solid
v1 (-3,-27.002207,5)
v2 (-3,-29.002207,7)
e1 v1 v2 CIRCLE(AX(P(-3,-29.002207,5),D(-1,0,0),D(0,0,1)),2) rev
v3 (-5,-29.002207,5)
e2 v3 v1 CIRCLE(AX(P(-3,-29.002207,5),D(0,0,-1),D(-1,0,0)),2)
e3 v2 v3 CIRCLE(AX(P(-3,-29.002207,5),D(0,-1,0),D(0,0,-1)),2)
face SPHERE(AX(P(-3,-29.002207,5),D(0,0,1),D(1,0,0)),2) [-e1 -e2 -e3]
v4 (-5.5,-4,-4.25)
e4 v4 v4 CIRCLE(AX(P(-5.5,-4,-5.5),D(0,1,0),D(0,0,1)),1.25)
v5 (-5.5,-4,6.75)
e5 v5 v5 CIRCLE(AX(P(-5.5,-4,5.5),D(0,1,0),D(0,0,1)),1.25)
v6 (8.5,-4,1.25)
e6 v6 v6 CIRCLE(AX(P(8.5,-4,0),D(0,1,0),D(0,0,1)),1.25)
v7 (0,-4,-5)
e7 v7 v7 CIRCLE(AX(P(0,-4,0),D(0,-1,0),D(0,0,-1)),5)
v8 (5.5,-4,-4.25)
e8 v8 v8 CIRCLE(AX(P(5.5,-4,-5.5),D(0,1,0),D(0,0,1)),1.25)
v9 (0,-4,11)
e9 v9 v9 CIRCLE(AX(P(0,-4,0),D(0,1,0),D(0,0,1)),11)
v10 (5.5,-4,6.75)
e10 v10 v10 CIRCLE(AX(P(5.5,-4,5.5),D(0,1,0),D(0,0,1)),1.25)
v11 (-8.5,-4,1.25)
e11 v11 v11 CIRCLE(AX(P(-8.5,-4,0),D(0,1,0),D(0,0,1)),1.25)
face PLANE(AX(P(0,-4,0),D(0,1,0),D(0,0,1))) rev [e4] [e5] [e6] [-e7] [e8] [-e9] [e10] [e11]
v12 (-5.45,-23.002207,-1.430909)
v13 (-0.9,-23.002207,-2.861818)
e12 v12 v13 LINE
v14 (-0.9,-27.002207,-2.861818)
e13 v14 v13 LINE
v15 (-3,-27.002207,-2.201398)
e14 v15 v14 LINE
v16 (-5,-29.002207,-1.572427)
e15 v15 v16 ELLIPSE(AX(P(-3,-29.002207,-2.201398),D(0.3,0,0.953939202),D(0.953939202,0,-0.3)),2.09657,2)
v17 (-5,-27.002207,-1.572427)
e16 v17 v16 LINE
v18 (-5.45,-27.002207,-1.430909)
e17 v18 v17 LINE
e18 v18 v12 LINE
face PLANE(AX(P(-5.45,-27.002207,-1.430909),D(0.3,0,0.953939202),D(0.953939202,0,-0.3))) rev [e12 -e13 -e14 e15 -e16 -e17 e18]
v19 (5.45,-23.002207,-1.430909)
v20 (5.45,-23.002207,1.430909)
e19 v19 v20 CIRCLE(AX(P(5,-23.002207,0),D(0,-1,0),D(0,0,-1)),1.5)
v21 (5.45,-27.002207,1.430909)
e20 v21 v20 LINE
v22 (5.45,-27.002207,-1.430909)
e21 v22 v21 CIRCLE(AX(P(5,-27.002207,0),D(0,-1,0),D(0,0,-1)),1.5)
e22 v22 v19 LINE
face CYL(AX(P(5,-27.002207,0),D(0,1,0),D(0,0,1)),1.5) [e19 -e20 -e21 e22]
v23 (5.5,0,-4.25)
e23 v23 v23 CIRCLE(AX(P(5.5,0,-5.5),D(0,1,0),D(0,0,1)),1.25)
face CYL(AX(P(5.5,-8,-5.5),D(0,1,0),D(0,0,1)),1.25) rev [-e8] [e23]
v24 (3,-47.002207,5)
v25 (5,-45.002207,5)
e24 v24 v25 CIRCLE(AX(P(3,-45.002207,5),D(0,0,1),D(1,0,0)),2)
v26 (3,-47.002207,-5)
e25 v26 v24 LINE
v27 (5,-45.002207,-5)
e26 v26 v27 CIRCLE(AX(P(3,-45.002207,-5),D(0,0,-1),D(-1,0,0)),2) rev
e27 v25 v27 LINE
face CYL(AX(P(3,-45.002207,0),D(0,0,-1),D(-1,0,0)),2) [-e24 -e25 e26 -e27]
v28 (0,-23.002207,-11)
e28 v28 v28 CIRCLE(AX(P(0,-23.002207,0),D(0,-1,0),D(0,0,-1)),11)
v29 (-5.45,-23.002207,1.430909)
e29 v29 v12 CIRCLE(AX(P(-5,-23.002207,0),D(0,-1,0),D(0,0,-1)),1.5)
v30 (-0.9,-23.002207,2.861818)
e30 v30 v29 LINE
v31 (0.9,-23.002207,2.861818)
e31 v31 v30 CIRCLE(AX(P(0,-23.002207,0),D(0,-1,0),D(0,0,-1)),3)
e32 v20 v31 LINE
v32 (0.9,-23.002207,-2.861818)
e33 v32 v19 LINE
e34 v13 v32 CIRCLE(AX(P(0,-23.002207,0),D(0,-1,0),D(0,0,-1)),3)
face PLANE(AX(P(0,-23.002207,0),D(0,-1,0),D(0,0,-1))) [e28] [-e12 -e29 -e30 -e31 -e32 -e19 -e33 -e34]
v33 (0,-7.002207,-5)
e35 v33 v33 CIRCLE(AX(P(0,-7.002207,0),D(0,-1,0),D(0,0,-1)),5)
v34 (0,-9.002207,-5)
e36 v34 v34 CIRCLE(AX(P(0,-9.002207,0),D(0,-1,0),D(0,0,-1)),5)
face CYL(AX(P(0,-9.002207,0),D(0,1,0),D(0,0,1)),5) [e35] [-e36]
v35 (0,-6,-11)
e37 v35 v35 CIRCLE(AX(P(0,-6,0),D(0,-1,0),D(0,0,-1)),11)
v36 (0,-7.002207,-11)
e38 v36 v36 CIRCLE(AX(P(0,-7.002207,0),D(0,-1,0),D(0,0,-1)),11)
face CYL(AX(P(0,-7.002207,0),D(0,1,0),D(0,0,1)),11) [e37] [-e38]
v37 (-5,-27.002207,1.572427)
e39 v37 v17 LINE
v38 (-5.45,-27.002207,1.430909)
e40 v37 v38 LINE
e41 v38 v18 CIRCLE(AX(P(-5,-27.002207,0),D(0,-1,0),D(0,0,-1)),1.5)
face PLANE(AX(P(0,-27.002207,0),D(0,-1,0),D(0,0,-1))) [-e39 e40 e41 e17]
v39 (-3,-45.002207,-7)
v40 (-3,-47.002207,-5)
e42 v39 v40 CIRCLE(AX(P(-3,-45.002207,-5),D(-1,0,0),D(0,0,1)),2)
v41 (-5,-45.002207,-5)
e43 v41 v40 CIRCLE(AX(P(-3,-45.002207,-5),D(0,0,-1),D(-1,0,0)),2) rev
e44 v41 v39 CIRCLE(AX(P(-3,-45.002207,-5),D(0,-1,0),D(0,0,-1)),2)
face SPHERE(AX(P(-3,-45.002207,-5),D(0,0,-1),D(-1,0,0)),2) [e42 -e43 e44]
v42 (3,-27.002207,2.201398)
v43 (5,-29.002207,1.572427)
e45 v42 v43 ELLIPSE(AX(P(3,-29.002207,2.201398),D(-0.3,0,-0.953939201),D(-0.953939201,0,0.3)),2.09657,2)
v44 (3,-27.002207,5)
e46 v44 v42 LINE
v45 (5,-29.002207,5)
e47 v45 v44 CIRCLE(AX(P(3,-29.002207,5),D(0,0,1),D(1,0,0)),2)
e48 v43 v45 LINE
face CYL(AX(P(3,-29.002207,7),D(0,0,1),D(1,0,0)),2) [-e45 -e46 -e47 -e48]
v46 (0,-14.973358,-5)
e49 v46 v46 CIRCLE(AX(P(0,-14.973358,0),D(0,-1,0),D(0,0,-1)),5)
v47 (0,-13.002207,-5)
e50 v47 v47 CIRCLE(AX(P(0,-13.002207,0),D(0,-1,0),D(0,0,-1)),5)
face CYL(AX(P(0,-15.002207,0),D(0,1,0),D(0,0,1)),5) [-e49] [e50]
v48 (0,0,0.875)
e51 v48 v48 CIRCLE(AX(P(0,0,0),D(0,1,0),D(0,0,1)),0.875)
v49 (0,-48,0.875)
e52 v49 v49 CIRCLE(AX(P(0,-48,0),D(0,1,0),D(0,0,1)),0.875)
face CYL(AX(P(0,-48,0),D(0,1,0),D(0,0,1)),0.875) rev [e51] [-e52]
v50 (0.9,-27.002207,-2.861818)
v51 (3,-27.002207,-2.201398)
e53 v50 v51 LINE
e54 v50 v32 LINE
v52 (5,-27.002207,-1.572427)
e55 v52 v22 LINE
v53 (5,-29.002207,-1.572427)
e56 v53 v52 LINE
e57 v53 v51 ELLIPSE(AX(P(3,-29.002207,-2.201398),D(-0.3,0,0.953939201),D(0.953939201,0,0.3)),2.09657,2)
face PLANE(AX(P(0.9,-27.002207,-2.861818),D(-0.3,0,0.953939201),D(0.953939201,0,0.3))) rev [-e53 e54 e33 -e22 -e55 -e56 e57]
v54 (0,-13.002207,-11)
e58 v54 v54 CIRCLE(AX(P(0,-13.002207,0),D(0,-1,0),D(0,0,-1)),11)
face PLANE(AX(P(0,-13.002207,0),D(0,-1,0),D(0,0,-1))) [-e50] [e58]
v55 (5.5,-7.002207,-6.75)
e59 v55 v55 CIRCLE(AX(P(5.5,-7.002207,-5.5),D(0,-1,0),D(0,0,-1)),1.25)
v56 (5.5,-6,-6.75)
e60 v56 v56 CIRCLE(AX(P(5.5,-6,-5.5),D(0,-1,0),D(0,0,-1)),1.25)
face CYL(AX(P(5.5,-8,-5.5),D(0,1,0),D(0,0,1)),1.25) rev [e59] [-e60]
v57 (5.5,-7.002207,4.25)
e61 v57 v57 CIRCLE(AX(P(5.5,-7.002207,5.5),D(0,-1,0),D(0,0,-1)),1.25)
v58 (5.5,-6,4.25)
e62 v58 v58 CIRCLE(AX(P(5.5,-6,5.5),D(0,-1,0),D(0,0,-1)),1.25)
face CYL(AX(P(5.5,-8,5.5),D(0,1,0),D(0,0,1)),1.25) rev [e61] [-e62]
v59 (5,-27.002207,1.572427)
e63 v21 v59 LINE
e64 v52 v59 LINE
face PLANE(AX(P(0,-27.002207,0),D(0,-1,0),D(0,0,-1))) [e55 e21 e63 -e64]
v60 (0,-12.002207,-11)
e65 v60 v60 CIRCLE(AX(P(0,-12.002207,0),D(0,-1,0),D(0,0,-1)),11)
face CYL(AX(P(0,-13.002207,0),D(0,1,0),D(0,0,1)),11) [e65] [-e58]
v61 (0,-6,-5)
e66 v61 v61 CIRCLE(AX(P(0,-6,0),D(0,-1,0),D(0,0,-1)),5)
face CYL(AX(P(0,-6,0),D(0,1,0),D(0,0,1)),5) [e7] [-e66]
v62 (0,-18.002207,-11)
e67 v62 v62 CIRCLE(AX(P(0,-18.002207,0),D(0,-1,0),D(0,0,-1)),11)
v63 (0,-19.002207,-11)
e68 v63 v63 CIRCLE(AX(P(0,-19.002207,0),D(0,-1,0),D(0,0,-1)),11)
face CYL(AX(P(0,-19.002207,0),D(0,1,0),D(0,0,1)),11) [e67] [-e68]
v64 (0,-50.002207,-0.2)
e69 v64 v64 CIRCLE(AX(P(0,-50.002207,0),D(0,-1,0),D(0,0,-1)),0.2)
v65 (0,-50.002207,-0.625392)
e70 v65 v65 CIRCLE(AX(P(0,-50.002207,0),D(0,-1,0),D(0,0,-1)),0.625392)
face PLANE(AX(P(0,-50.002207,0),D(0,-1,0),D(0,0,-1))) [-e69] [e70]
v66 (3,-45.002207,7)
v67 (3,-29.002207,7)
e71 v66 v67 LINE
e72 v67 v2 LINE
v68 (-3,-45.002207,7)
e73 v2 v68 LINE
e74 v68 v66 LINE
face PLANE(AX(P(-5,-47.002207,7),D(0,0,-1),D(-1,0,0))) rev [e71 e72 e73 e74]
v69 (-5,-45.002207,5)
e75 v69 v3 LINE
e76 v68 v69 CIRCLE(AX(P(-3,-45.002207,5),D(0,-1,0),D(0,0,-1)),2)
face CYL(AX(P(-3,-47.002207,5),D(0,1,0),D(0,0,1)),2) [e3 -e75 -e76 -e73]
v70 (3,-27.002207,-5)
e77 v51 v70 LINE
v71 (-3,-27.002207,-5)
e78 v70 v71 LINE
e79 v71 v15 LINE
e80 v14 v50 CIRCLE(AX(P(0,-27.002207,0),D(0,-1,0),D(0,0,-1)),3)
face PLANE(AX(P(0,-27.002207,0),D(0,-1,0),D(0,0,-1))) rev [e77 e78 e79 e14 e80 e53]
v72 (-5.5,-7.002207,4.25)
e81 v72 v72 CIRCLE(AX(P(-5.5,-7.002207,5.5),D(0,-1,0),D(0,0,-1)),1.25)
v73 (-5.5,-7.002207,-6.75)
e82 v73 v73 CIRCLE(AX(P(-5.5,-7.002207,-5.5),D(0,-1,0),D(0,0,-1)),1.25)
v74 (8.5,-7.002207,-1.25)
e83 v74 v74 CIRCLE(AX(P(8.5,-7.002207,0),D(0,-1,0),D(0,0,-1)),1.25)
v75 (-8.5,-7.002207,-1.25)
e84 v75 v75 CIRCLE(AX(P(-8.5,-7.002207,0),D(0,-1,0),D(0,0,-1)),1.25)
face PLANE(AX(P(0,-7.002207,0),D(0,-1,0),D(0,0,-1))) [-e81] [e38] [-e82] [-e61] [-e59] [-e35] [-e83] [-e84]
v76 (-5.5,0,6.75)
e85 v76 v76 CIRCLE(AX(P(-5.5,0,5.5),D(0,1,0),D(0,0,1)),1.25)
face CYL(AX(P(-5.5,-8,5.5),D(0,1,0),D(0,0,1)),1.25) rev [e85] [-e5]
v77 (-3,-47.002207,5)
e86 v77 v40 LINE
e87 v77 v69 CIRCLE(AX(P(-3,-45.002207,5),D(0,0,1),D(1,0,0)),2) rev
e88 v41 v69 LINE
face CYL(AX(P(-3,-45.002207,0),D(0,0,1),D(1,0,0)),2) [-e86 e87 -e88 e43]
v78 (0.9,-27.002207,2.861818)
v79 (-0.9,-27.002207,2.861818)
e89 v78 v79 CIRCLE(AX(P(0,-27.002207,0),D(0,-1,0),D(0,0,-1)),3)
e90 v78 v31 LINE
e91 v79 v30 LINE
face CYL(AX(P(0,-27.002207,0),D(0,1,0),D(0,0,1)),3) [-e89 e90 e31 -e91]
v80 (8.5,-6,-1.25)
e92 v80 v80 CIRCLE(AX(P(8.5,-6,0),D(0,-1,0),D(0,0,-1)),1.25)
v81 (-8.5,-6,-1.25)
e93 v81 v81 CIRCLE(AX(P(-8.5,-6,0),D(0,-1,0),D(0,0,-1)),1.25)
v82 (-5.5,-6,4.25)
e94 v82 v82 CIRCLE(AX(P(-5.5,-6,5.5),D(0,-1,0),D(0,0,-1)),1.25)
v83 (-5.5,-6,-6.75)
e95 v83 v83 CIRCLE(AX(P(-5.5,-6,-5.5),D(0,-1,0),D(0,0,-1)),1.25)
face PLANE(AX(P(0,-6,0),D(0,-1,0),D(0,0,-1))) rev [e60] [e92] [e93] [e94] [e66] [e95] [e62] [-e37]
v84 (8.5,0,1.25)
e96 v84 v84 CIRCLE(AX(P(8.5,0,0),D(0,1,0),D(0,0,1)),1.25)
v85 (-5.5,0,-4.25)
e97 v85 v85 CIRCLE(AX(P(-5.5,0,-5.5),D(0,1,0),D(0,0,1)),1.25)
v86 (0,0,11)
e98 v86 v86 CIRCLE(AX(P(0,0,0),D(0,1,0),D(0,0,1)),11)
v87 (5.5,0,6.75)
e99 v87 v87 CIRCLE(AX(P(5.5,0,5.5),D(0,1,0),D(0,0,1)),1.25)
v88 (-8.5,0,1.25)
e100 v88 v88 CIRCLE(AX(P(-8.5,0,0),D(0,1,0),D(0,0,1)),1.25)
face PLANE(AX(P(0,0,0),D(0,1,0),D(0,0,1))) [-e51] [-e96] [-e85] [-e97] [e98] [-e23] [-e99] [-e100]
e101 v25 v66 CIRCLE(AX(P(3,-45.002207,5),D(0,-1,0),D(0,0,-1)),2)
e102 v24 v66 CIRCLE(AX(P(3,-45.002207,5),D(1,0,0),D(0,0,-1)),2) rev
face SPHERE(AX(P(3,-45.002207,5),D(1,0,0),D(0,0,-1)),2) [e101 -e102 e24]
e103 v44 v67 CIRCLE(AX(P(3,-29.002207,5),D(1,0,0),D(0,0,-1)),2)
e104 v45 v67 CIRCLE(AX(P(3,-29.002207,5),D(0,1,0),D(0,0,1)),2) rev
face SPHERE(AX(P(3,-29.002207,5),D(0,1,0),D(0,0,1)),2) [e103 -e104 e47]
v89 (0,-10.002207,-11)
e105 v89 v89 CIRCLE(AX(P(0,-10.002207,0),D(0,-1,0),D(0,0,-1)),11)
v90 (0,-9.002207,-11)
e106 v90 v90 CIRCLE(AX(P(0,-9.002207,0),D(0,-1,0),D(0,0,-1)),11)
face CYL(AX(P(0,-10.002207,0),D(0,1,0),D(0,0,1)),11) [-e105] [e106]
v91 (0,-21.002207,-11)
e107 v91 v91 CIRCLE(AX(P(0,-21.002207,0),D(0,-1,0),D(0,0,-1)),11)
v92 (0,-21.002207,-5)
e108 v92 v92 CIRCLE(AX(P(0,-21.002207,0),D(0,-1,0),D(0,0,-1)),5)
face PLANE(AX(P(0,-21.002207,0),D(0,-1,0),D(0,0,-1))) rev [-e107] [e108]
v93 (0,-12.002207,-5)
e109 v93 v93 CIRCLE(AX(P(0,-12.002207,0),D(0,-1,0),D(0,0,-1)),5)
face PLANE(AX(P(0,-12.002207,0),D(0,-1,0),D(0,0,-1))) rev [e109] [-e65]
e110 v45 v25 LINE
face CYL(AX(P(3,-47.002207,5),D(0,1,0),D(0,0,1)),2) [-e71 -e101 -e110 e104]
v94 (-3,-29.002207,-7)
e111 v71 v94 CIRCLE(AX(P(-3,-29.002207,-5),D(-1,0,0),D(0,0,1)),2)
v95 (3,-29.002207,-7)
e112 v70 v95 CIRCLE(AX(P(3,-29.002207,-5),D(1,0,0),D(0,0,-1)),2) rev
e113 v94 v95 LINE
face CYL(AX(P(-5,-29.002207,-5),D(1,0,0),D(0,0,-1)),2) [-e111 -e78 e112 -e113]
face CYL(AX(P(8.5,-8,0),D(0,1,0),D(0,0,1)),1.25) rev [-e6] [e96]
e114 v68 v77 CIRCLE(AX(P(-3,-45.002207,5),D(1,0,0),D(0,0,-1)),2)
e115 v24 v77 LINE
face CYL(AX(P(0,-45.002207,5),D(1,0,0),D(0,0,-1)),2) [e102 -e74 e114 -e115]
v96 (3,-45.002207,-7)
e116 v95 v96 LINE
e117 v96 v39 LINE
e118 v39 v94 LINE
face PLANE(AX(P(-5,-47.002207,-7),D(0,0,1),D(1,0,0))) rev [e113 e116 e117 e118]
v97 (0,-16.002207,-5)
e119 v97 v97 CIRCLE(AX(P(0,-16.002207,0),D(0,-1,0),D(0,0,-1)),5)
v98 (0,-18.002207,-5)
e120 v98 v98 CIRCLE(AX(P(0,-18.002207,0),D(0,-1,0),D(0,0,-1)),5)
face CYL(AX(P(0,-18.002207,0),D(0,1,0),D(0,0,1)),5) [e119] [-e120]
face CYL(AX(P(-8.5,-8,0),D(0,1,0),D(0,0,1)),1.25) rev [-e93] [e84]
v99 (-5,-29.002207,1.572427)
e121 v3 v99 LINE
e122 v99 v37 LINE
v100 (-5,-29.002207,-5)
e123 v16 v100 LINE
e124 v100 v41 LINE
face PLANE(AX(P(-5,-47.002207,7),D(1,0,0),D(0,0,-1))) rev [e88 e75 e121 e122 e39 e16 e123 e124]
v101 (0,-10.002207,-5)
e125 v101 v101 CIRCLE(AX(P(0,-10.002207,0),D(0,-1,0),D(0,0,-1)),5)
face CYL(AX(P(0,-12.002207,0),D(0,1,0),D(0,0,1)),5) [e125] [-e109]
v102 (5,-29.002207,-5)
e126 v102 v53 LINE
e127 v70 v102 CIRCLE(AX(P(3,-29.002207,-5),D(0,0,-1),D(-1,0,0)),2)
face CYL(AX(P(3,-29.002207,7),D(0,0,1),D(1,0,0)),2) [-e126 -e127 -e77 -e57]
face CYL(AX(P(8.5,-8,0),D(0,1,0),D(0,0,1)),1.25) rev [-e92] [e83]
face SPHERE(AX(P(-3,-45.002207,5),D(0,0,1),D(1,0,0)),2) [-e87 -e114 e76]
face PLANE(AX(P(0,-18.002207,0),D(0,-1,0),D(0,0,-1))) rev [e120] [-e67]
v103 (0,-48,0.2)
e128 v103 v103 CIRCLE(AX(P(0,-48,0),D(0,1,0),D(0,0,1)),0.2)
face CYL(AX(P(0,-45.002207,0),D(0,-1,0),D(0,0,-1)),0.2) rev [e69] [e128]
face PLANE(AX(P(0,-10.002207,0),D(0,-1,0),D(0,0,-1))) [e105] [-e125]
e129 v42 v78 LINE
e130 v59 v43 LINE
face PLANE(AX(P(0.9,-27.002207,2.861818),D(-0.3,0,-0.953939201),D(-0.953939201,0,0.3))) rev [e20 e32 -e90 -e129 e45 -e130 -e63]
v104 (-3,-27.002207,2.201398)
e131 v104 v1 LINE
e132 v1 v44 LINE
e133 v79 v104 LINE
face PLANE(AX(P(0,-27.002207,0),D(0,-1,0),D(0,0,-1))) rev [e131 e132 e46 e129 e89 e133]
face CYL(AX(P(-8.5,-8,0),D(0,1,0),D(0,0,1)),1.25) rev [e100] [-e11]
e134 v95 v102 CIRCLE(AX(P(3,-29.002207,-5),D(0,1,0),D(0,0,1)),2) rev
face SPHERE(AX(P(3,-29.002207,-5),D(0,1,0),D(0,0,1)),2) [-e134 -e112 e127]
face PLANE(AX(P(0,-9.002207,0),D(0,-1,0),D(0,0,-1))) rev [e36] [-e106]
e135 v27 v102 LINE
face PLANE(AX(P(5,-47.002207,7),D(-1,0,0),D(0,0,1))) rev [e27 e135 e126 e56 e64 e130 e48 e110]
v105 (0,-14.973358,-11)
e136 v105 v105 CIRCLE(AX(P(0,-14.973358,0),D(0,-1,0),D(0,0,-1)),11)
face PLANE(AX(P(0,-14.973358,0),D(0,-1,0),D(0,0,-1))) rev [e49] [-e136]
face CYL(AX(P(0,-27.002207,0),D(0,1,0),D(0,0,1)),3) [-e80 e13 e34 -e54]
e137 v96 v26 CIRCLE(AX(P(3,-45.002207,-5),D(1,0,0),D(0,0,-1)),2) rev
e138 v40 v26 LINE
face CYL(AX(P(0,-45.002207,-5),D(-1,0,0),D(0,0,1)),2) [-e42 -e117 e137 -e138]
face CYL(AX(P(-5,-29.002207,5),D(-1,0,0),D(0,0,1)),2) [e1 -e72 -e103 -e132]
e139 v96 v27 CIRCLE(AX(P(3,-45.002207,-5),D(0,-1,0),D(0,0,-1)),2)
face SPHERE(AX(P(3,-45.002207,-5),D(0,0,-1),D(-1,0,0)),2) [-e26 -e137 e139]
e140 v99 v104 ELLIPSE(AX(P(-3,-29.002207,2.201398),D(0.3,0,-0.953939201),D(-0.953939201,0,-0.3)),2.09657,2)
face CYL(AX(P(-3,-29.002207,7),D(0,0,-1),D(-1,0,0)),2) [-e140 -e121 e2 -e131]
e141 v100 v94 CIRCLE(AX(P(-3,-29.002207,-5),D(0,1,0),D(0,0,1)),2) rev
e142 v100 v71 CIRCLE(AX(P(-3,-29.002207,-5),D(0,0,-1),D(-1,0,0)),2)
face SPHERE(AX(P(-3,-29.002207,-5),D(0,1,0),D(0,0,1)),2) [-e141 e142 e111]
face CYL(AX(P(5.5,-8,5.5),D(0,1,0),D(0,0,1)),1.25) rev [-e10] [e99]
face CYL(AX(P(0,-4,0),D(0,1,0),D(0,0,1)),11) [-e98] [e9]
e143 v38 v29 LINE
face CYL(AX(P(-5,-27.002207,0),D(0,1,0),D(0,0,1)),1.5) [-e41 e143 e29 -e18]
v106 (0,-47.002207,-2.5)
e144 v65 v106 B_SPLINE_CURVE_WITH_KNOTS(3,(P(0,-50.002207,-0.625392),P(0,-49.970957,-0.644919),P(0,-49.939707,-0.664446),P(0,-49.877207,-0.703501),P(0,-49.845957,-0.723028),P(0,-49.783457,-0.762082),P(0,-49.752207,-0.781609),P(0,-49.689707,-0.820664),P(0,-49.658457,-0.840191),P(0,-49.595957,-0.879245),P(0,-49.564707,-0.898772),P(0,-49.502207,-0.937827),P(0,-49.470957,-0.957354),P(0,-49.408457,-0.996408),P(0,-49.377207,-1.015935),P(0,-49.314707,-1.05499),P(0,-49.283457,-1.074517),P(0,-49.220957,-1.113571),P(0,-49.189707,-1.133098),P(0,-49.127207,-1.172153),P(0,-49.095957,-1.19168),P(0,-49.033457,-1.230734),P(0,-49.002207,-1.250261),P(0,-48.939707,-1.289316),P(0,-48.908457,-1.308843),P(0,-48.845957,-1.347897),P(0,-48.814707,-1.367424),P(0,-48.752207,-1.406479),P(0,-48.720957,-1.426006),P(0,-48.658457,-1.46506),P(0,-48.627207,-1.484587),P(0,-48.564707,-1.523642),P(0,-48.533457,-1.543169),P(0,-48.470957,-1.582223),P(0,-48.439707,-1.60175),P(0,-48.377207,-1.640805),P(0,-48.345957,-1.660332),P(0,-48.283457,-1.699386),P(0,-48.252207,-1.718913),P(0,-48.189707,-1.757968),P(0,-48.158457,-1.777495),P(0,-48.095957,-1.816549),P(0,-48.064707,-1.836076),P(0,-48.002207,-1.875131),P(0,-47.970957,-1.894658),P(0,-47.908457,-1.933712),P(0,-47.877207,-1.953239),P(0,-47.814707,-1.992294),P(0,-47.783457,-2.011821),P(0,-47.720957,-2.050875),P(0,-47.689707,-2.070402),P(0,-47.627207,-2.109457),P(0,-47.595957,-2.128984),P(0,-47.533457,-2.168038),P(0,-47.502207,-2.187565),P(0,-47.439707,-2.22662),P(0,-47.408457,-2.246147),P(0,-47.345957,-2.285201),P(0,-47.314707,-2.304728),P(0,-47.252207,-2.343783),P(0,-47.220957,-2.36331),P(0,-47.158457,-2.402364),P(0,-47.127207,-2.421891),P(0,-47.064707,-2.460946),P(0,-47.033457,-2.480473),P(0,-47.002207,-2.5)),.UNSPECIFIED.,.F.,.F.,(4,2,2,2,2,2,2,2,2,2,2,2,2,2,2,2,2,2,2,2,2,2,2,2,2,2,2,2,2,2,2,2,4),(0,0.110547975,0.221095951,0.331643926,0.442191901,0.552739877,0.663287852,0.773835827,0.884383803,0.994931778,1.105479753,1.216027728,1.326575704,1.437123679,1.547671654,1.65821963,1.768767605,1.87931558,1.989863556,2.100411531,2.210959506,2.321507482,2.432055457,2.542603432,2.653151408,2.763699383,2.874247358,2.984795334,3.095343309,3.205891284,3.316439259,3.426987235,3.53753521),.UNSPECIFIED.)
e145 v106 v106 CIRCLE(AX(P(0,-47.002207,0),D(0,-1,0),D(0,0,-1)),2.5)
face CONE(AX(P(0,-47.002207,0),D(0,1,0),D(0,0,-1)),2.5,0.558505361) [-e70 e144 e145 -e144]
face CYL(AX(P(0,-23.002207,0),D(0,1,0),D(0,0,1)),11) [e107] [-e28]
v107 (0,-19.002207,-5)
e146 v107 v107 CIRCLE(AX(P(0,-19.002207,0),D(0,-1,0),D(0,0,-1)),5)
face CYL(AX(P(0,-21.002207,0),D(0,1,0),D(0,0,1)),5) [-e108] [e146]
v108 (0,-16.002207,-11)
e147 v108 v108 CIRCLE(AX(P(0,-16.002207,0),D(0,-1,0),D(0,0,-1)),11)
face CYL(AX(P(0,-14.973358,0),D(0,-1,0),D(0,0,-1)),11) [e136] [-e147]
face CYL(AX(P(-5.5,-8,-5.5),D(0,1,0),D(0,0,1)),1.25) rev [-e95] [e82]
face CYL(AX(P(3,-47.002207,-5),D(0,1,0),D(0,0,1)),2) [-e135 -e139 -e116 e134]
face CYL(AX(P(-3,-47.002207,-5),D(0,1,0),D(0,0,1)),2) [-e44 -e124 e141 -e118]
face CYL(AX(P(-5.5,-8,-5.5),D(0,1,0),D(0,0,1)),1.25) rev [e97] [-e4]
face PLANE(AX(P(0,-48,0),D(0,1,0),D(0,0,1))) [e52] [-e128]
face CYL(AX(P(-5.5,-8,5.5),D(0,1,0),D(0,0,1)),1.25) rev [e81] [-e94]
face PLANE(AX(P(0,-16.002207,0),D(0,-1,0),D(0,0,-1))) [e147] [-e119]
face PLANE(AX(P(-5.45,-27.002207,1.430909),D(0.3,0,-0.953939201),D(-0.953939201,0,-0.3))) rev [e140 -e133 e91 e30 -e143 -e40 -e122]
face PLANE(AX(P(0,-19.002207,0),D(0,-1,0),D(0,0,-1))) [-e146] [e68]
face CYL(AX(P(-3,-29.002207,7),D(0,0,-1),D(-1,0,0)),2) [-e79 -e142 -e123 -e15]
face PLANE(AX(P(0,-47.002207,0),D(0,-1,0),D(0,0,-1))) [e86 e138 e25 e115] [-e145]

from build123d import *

# Parameters (mm, degrees)
SKETCH1_R                 = 11
BOSS_EXTRUDE2_DEPTH       = 4
SKETCH2_R                 = 5
BOSS_EXTRUDE3_DEPTH       = 2
SKETCH3_R                 = 11
BOSS_EXTRUDE4_DEPTH       = 1.002207304
SKETCH4_R                 = 5
BOSS_EXTRUDE5_DEPTH       = 2
SKETCH5_R                 = 11
BOSS_EXTRUDE6_DEPTH       = 1
SKETCH6_R                 = 5
BOSS_EXTRUDE7_DEPTH       = 2
SKETCH7_R                 = 11
BOSS_EXTRUDE8_DEPTH       = 1
SKETCH8_R                 = 5
BOSS_EXTRUDE9_DEPTH       = 2
BOSS_EXTRUDE10_DEPTH      = 1
BOSS_EXTRUDE10_DEPTH_BACK = 0.02884934
SKETCH9_R                 = 11
SKETCH10_R                = 5
BOSS_EXTRUDE11_DEPTH      = 2
SKETCH11_R                = 11
BOSS_EXTRUDE12_DEPTH      = 1
SKETCH12_R                = 5
BOSS_EXTRUDE13_DEPTH      = 2
SKETCH13_R                = 11
BOSS_EXTRUDE14_DEPTH      = 2
BOSS_EXTRUDE15_DEPTH      = 4
SKETCH15_W                = 10
SKETCH15_H                = 14
BOSS_EXTRUDE16_DEPTH      = 20
SKETCH17_R                = 2.5
BOSS_EXTRUDE17_DEPTH      = 3
BOSS_EXTRUDE17_TAPER      = 32
SKETCH18_R                = 0.875
CUT_EXTRUDE2_DEPTH        = 48
SKETCH19_R                = 0.2
CUT_EXTRUDE3_DEPTH        = 5
FILLET1_R                 = 2
FILLET2_R                 = 2
SKETCH20_R                = 1.25
CUT_EXTRUDE4_DEPTH        = 8
SKETCH22_R                = 1.25
CUT_EXTRUDE5_DEPTH        = 8


with BuildPart() as part:
    # Sketch1 → Boss-Extrude2 (new body)
    with BuildSketch(Plane(origin=(0, 0, 0), x_dir=(1, 0, 0), z_dir=(0, 1, 0))):
        with Locations(Location((0, 0, 0), (0, 0, 270))):
            Circle(SKETCH1_R)
    extrude(amount=-BOSS_EXTRUDE2_DEPTH)

    # Sketch2 → Boss-Extrude3 (add)
    with BuildSketch(Plane(origin=(0, -4, 0), x_dir=(-1, 0, 0), z_dir=(0, -1, 0))):
        with Locations(Location((0, 0, 0), (0, 0, 90))):
            Circle(SKETCH2_R)
    extrude(amount=BOSS_EXTRUDE3_DEPTH)

    # Sketch3 → Boss-Extrude4 (add)
    with BuildSketch(Plane.XZ.offset(6)):
        with Locations(Location((0, 0, 0), (0, 0, 90))):
            Circle(SKETCH3_R)
    extrude(amount=BOSS_EXTRUDE4_DEPTH)

    # Sketch4 → Boss-Extrude5 (add)
    with BuildSketch(Plane(origin=(0, -7.002207304, 0), x_dir=(-1, 0, 0), z_dir=(0, -1, 0))):
        with Locations(Location((0, 0, 0), (0, 0, 90))):
            Circle(SKETCH4_R)
    extrude(amount=BOSS_EXTRUDE5_DEPTH)

    # Sketch5 → Boss-Extrude6 (add)
    with BuildSketch(Plane.XZ.offset(9.002207304)):
        with Locations(Location((0, 0, 0), (0, 0, 90))):
            Circle(SKETCH5_R)
    extrude(amount=BOSS_EXTRUDE6_DEPTH)

    # Sketch6 → Boss-Extrude7 (add)
    with BuildSketch(Plane(origin=(0, -10.002207304, 0), x_dir=(-1, 0, 0), z_dir=(0, -1, 0))):
        with Locations(Location((0, 0, 0), (0, 0, 90))):
            Circle(SKETCH6_R)
    extrude(amount=BOSS_EXTRUDE7_DEPTH)

    # Sketch7 → Boss-Extrude8 (add)
    with BuildSketch(Plane(origin=(0, -12.002207304, 0), x_dir=(-1, 0, 0), z_dir=(0, -1, 0))):
        with Locations(Location((0, 0, 0), (0, 0, 270))):
            Circle(SKETCH7_R)
    extrude(amount=BOSS_EXTRUDE8_DEPTH)

    # Sketch8 → Boss-Extrude9 (add)
    with BuildSketch(Plane(origin=(0, -13.002207304, 0), x_dir=(-1, 0, 0), z_dir=(0, -1, 0))):
        with Locations(Location((0, 0, 0), (0, 0, 90))):
            Circle(SKETCH8_R)
    extrude(amount=BOSS_EXTRUDE9_DEPTH)

    # Sketch9 → Boss-Extrude10 (add, two sides: drawn at the far end of the back side and taken through both)
    with BuildSketch(Plane(origin=(0, -15.002207304, 0), x_dir=(-1, 0, 0), z_dir=(0, -1, 0)).offset(-BOSS_EXTRUDE10_DEPTH_BACK)):
        with Locations(Location((0, 0, 0), (0, 0, 270))):
            Circle(SKETCH9_R)
    extrude(amount=BOSS_EXTRUDE10_DEPTH + BOSS_EXTRUDE10_DEPTH_BACK)

    # Sketch10 → Boss-Extrude11 (add)
    with BuildSketch(Plane(origin=(0, -16.002207304, 0), x_dir=(-1, 0, 0), z_dir=(0, -1, 0))):
        with Locations(Location((0, 0, 0), (0, 0, 90))):
            Circle(SKETCH10_R)
    extrude(amount=BOSS_EXTRUDE11_DEPTH)

    # Sketch11 → Boss-Extrude12 (add)
    with BuildSketch(Plane(origin=(0, -18.002207304, 0), x_dir=(-1, 0, 0), z_dir=(0, -1, 0))):
        with Locations(Location((0, 0, 0), (0, 0, 270))):
            Circle(SKETCH11_R)
    extrude(amount=BOSS_EXTRUDE12_DEPTH)

    # Sketch12 → Boss-Extrude13 (add)
    with BuildSketch(Plane(origin=(0, -19.002207304, 0), x_dir=(-1, 0, 0), z_dir=(0, -1, 0))):
        with Locations(Location((0, 0, 0), (0, 0, 90))):
            Circle(SKETCH12_R)
    extrude(amount=BOSS_EXTRUDE13_DEPTH)

    # Sketch13 → Boss-Extrude14 (add)
    with BuildSketch(Plane(origin=(0, -21.002207304, 0), x_dir=(-1, 0, 0), z_dir=(0, -1, 0))):
        with Locations(Location((0, 0, 0), (0, 0, 270))):
            Circle(SKETCH13_R)
    extrude(amount=BOSS_EXTRUDE14_DEPTH)

    # Sketch14 → Boss-Extrude15 (add)
    with BuildSketch(Plane(origin=(0, -23.002207304, 0), x_dir=(-1, 0, 0), z_dir=(0, -1, 0))):
        with BuildLine():
            Line((5.450000001, -1.4309088), (0.900000001, -2.861817604))
            ThreePointArc((0.900000001, -2.861817604), (1e-09, -3), (-0.9, -2.861817604))
            Line((-0.9, -2.861817604), (-5.45, -1.430908802))
            ThreePointArc((-5.45, -1.430908802), (-6.5, 0), (-5.45, 1.430908802))
            Line((-5.45, 1.430908802), (-0.9, 2.861817604))
            ThreePointArc((-0.9, 2.861817604), (-1e-09, 3), (0.899999999, 2.861817605))
            Line((0.899999999, 2.861817605), (5.450000001, 1.430908804))
            ThreePointArc((5.450000001, 1.430908804), (6.5, 2e-09), (5.450000001, -1.4309088))
        make_face()
    extrude(amount=BOSS_EXTRUDE15_DEPTH)

    # Sketch15 → Boss-Extrude16 (add)
    with BuildSketch(Plane(origin=(0, -27.002207304, 0), x_dir=(-1, 0, 0), z_dir=(0, -1, 0))):
        Rectangle(SKETCH15_W, SKETCH15_H)
    extrude(amount=BOSS_EXTRUDE16_DEPTH)

    # Sketch17 → Boss-Extrude17 (add)
    with BuildSketch(Plane(origin=(0, -47.002207304, 0), x_dir=(-1, 0, 0), z_dir=(0, -1, 0))):
        Circle(SKETCH17_R)
    extrude(amount=BOSS_EXTRUDE17_DEPTH, taper=BOSS_EXTRUDE17_TAPER)

    # Sketch18 → Cut-Extrude2 (cut)
    with BuildSketch(Plane(origin=(0, 0, 0), x_dir=(1, 0, 0), z_dir=(0, 1, 0))):
        with Locations(Location((0, 0, 0), (0, 0, 270))):
            Circle(SKETCH18_R)
    extrude(amount=-CUT_EXTRUDE2_DEPTH, mode=Mode.SUBTRACT)

    # Sketch19 → Cut-Extrude3 (cut)
    with BuildSketch(Plane(origin=(0, -50.002207304, 0), x_dir=(-1, 0, 0), z_dir=(0, -1, 0))):
        with Locations(Location((0, 0, 0), (0, 0, 90))):
            Circle(SKETCH19_R)
    extrude(amount=-CUT_EXTRUDE3_DEPTH, mode=Mode.SUBTRACT)

    # Fillet1
    fillet1_edges = [part.edges().sort_by_distance(p)[0] for p in [
        (5, -27.002207304, -4.286213628),
        (5, -27.002207304, 4.286213628),
        (5, -37.002207304, -7),
        (0, -27.002207304, 7),
        (5, -37.002207304, 7),
        (-5, -27.002207304, 4.286213627),
        (-5, -27.002207304, -4.286213629),
        (0, -27.002207304, -7),
        (-5, -37.002207304, -7),
        (5, -47.002207304, 0),
        (0, -47.002207304, 7),
        (-5, -47.002207304, 0),
        (0, -47.002207304, -7),
    ]]
    fillet(fillet1_edges, radius=FILLET1_R)

    # Fillet2
    # the kernel refuses this fillet: 2 mm, written as the material it takes off along each edge
    with BuildSketch(Plane(origin=(-3, -29.002207304, 5), x_dir=(0, 0, 1), z_dir=(-1, 0, 0))) as fillet2_piece_1_section:
        Polygon((0, 0), (FILLET2_R, 0), (FILLET2_R, FILLET2_R), (0, FILLET2_R), align=None)
    fillet2_piece_1 = extrude(amount=FILLET2_R, mode=Mode.PRIVATE)
    fillet2_piece_1 = fillet2_piece_1 - Plane(origin=(-3, -29.002207304, 5), x_dir=(0, -0.7071067811865475, -0.7071067811865475), z_dir=(-1, 0, 0)) * Sphere(FILLET2_R, mode=Mode.PRIVATE)
    add(fillet2_piece_1, mode=Mode.SUBTRACT)
    with BuildSketch(Plane(origin=(-3, -45.002207304, 5), x_dir=(0, 0, 1), z_dir=(-1, 0, 0))) as fillet2_piece_2_section:
        Polygon((0, 0), (FILLET2_R, 0), (FILLET2_R, -FILLET2_R), (0, -FILLET2_R), align=None)
    fillet2_piece_2 = extrude(amount=FILLET2_R, mode=Mode.PRIVATE)
    fillet2_piece_2 = fillet2_piece_2 - Plane(origin=(-3, -45.002207304, 5), x_dir=(0, 0.7071067811865475, -0.7071067811865475), z_dir=(-1, 0, 0)) * Sphere(FILLET2_R, mode=Mode.PRIVATE)
    add(fillet2_piece_2, mode=Mode.SUBTRACT)
    with BuildSketch(Plane(origin=(-5, -29.002207304, 7), x_dir=(0, 0, -1), z_dir=(0, -1, 0))) as fillet2_piece_3:
        with BuildLine():
            CenterArc((FILLET2_R, FILLET2_R), FILLET2_R, 180, 90)
            Line((0, FILLET2_R), (0, 0))
            Line((0, 0), (FILLET2_R, 0))
        make_face()
    extrude(amount=16, mode=Mode.SUBTRACT)

    # Sketch20 → Cut-Extrude4 (cut)
    with BuildSketch(Plane(origin=(0, 0, 0), x_dir=(1, 0, 0), z_dir=(0, 1, 0))):
        with Locations(Location((-5.5, 5.5, 0), (0, 0, 90))):
            Circle(SKETCH20_R)
        with Locations(Location((5.5, 5.5, 0), (0, 0, 90))):
            Circle(SKETCH20_R)
        with Locations(Location((-5.5, -5.5, 0), (0, 0, 90))):
            Circle(SKETCH20_R)
        with Locations(Location((5.5, -5.5, 0), (0, 0, 90))):
            Circle(SKETCH20_R)
    extrude(amount=-CUT_EXTRUDE4_DEPTH, mode=Mode.SUBTRACT)

    # Sketch22 → Cut-Extrude5 (cut)
    with BuildSketch(Plane(origin=(0, 0, 0), x_dir=(1, 0, 0), z_dir=(0, 1, 0))):
        with Locations(Location((-8.5, 0, 0), (0, 0, 90))):
            Circle(SKETCH22_R)
        with Locations(Location((8.5, 0, 0), (0, 0, 90))):
            Circle(SKETCH22_R)
    extrude(amount=-CUT_EXTRUDE5_DEPTH, mode=Mode.SUBTRACT)


solid = part.part
